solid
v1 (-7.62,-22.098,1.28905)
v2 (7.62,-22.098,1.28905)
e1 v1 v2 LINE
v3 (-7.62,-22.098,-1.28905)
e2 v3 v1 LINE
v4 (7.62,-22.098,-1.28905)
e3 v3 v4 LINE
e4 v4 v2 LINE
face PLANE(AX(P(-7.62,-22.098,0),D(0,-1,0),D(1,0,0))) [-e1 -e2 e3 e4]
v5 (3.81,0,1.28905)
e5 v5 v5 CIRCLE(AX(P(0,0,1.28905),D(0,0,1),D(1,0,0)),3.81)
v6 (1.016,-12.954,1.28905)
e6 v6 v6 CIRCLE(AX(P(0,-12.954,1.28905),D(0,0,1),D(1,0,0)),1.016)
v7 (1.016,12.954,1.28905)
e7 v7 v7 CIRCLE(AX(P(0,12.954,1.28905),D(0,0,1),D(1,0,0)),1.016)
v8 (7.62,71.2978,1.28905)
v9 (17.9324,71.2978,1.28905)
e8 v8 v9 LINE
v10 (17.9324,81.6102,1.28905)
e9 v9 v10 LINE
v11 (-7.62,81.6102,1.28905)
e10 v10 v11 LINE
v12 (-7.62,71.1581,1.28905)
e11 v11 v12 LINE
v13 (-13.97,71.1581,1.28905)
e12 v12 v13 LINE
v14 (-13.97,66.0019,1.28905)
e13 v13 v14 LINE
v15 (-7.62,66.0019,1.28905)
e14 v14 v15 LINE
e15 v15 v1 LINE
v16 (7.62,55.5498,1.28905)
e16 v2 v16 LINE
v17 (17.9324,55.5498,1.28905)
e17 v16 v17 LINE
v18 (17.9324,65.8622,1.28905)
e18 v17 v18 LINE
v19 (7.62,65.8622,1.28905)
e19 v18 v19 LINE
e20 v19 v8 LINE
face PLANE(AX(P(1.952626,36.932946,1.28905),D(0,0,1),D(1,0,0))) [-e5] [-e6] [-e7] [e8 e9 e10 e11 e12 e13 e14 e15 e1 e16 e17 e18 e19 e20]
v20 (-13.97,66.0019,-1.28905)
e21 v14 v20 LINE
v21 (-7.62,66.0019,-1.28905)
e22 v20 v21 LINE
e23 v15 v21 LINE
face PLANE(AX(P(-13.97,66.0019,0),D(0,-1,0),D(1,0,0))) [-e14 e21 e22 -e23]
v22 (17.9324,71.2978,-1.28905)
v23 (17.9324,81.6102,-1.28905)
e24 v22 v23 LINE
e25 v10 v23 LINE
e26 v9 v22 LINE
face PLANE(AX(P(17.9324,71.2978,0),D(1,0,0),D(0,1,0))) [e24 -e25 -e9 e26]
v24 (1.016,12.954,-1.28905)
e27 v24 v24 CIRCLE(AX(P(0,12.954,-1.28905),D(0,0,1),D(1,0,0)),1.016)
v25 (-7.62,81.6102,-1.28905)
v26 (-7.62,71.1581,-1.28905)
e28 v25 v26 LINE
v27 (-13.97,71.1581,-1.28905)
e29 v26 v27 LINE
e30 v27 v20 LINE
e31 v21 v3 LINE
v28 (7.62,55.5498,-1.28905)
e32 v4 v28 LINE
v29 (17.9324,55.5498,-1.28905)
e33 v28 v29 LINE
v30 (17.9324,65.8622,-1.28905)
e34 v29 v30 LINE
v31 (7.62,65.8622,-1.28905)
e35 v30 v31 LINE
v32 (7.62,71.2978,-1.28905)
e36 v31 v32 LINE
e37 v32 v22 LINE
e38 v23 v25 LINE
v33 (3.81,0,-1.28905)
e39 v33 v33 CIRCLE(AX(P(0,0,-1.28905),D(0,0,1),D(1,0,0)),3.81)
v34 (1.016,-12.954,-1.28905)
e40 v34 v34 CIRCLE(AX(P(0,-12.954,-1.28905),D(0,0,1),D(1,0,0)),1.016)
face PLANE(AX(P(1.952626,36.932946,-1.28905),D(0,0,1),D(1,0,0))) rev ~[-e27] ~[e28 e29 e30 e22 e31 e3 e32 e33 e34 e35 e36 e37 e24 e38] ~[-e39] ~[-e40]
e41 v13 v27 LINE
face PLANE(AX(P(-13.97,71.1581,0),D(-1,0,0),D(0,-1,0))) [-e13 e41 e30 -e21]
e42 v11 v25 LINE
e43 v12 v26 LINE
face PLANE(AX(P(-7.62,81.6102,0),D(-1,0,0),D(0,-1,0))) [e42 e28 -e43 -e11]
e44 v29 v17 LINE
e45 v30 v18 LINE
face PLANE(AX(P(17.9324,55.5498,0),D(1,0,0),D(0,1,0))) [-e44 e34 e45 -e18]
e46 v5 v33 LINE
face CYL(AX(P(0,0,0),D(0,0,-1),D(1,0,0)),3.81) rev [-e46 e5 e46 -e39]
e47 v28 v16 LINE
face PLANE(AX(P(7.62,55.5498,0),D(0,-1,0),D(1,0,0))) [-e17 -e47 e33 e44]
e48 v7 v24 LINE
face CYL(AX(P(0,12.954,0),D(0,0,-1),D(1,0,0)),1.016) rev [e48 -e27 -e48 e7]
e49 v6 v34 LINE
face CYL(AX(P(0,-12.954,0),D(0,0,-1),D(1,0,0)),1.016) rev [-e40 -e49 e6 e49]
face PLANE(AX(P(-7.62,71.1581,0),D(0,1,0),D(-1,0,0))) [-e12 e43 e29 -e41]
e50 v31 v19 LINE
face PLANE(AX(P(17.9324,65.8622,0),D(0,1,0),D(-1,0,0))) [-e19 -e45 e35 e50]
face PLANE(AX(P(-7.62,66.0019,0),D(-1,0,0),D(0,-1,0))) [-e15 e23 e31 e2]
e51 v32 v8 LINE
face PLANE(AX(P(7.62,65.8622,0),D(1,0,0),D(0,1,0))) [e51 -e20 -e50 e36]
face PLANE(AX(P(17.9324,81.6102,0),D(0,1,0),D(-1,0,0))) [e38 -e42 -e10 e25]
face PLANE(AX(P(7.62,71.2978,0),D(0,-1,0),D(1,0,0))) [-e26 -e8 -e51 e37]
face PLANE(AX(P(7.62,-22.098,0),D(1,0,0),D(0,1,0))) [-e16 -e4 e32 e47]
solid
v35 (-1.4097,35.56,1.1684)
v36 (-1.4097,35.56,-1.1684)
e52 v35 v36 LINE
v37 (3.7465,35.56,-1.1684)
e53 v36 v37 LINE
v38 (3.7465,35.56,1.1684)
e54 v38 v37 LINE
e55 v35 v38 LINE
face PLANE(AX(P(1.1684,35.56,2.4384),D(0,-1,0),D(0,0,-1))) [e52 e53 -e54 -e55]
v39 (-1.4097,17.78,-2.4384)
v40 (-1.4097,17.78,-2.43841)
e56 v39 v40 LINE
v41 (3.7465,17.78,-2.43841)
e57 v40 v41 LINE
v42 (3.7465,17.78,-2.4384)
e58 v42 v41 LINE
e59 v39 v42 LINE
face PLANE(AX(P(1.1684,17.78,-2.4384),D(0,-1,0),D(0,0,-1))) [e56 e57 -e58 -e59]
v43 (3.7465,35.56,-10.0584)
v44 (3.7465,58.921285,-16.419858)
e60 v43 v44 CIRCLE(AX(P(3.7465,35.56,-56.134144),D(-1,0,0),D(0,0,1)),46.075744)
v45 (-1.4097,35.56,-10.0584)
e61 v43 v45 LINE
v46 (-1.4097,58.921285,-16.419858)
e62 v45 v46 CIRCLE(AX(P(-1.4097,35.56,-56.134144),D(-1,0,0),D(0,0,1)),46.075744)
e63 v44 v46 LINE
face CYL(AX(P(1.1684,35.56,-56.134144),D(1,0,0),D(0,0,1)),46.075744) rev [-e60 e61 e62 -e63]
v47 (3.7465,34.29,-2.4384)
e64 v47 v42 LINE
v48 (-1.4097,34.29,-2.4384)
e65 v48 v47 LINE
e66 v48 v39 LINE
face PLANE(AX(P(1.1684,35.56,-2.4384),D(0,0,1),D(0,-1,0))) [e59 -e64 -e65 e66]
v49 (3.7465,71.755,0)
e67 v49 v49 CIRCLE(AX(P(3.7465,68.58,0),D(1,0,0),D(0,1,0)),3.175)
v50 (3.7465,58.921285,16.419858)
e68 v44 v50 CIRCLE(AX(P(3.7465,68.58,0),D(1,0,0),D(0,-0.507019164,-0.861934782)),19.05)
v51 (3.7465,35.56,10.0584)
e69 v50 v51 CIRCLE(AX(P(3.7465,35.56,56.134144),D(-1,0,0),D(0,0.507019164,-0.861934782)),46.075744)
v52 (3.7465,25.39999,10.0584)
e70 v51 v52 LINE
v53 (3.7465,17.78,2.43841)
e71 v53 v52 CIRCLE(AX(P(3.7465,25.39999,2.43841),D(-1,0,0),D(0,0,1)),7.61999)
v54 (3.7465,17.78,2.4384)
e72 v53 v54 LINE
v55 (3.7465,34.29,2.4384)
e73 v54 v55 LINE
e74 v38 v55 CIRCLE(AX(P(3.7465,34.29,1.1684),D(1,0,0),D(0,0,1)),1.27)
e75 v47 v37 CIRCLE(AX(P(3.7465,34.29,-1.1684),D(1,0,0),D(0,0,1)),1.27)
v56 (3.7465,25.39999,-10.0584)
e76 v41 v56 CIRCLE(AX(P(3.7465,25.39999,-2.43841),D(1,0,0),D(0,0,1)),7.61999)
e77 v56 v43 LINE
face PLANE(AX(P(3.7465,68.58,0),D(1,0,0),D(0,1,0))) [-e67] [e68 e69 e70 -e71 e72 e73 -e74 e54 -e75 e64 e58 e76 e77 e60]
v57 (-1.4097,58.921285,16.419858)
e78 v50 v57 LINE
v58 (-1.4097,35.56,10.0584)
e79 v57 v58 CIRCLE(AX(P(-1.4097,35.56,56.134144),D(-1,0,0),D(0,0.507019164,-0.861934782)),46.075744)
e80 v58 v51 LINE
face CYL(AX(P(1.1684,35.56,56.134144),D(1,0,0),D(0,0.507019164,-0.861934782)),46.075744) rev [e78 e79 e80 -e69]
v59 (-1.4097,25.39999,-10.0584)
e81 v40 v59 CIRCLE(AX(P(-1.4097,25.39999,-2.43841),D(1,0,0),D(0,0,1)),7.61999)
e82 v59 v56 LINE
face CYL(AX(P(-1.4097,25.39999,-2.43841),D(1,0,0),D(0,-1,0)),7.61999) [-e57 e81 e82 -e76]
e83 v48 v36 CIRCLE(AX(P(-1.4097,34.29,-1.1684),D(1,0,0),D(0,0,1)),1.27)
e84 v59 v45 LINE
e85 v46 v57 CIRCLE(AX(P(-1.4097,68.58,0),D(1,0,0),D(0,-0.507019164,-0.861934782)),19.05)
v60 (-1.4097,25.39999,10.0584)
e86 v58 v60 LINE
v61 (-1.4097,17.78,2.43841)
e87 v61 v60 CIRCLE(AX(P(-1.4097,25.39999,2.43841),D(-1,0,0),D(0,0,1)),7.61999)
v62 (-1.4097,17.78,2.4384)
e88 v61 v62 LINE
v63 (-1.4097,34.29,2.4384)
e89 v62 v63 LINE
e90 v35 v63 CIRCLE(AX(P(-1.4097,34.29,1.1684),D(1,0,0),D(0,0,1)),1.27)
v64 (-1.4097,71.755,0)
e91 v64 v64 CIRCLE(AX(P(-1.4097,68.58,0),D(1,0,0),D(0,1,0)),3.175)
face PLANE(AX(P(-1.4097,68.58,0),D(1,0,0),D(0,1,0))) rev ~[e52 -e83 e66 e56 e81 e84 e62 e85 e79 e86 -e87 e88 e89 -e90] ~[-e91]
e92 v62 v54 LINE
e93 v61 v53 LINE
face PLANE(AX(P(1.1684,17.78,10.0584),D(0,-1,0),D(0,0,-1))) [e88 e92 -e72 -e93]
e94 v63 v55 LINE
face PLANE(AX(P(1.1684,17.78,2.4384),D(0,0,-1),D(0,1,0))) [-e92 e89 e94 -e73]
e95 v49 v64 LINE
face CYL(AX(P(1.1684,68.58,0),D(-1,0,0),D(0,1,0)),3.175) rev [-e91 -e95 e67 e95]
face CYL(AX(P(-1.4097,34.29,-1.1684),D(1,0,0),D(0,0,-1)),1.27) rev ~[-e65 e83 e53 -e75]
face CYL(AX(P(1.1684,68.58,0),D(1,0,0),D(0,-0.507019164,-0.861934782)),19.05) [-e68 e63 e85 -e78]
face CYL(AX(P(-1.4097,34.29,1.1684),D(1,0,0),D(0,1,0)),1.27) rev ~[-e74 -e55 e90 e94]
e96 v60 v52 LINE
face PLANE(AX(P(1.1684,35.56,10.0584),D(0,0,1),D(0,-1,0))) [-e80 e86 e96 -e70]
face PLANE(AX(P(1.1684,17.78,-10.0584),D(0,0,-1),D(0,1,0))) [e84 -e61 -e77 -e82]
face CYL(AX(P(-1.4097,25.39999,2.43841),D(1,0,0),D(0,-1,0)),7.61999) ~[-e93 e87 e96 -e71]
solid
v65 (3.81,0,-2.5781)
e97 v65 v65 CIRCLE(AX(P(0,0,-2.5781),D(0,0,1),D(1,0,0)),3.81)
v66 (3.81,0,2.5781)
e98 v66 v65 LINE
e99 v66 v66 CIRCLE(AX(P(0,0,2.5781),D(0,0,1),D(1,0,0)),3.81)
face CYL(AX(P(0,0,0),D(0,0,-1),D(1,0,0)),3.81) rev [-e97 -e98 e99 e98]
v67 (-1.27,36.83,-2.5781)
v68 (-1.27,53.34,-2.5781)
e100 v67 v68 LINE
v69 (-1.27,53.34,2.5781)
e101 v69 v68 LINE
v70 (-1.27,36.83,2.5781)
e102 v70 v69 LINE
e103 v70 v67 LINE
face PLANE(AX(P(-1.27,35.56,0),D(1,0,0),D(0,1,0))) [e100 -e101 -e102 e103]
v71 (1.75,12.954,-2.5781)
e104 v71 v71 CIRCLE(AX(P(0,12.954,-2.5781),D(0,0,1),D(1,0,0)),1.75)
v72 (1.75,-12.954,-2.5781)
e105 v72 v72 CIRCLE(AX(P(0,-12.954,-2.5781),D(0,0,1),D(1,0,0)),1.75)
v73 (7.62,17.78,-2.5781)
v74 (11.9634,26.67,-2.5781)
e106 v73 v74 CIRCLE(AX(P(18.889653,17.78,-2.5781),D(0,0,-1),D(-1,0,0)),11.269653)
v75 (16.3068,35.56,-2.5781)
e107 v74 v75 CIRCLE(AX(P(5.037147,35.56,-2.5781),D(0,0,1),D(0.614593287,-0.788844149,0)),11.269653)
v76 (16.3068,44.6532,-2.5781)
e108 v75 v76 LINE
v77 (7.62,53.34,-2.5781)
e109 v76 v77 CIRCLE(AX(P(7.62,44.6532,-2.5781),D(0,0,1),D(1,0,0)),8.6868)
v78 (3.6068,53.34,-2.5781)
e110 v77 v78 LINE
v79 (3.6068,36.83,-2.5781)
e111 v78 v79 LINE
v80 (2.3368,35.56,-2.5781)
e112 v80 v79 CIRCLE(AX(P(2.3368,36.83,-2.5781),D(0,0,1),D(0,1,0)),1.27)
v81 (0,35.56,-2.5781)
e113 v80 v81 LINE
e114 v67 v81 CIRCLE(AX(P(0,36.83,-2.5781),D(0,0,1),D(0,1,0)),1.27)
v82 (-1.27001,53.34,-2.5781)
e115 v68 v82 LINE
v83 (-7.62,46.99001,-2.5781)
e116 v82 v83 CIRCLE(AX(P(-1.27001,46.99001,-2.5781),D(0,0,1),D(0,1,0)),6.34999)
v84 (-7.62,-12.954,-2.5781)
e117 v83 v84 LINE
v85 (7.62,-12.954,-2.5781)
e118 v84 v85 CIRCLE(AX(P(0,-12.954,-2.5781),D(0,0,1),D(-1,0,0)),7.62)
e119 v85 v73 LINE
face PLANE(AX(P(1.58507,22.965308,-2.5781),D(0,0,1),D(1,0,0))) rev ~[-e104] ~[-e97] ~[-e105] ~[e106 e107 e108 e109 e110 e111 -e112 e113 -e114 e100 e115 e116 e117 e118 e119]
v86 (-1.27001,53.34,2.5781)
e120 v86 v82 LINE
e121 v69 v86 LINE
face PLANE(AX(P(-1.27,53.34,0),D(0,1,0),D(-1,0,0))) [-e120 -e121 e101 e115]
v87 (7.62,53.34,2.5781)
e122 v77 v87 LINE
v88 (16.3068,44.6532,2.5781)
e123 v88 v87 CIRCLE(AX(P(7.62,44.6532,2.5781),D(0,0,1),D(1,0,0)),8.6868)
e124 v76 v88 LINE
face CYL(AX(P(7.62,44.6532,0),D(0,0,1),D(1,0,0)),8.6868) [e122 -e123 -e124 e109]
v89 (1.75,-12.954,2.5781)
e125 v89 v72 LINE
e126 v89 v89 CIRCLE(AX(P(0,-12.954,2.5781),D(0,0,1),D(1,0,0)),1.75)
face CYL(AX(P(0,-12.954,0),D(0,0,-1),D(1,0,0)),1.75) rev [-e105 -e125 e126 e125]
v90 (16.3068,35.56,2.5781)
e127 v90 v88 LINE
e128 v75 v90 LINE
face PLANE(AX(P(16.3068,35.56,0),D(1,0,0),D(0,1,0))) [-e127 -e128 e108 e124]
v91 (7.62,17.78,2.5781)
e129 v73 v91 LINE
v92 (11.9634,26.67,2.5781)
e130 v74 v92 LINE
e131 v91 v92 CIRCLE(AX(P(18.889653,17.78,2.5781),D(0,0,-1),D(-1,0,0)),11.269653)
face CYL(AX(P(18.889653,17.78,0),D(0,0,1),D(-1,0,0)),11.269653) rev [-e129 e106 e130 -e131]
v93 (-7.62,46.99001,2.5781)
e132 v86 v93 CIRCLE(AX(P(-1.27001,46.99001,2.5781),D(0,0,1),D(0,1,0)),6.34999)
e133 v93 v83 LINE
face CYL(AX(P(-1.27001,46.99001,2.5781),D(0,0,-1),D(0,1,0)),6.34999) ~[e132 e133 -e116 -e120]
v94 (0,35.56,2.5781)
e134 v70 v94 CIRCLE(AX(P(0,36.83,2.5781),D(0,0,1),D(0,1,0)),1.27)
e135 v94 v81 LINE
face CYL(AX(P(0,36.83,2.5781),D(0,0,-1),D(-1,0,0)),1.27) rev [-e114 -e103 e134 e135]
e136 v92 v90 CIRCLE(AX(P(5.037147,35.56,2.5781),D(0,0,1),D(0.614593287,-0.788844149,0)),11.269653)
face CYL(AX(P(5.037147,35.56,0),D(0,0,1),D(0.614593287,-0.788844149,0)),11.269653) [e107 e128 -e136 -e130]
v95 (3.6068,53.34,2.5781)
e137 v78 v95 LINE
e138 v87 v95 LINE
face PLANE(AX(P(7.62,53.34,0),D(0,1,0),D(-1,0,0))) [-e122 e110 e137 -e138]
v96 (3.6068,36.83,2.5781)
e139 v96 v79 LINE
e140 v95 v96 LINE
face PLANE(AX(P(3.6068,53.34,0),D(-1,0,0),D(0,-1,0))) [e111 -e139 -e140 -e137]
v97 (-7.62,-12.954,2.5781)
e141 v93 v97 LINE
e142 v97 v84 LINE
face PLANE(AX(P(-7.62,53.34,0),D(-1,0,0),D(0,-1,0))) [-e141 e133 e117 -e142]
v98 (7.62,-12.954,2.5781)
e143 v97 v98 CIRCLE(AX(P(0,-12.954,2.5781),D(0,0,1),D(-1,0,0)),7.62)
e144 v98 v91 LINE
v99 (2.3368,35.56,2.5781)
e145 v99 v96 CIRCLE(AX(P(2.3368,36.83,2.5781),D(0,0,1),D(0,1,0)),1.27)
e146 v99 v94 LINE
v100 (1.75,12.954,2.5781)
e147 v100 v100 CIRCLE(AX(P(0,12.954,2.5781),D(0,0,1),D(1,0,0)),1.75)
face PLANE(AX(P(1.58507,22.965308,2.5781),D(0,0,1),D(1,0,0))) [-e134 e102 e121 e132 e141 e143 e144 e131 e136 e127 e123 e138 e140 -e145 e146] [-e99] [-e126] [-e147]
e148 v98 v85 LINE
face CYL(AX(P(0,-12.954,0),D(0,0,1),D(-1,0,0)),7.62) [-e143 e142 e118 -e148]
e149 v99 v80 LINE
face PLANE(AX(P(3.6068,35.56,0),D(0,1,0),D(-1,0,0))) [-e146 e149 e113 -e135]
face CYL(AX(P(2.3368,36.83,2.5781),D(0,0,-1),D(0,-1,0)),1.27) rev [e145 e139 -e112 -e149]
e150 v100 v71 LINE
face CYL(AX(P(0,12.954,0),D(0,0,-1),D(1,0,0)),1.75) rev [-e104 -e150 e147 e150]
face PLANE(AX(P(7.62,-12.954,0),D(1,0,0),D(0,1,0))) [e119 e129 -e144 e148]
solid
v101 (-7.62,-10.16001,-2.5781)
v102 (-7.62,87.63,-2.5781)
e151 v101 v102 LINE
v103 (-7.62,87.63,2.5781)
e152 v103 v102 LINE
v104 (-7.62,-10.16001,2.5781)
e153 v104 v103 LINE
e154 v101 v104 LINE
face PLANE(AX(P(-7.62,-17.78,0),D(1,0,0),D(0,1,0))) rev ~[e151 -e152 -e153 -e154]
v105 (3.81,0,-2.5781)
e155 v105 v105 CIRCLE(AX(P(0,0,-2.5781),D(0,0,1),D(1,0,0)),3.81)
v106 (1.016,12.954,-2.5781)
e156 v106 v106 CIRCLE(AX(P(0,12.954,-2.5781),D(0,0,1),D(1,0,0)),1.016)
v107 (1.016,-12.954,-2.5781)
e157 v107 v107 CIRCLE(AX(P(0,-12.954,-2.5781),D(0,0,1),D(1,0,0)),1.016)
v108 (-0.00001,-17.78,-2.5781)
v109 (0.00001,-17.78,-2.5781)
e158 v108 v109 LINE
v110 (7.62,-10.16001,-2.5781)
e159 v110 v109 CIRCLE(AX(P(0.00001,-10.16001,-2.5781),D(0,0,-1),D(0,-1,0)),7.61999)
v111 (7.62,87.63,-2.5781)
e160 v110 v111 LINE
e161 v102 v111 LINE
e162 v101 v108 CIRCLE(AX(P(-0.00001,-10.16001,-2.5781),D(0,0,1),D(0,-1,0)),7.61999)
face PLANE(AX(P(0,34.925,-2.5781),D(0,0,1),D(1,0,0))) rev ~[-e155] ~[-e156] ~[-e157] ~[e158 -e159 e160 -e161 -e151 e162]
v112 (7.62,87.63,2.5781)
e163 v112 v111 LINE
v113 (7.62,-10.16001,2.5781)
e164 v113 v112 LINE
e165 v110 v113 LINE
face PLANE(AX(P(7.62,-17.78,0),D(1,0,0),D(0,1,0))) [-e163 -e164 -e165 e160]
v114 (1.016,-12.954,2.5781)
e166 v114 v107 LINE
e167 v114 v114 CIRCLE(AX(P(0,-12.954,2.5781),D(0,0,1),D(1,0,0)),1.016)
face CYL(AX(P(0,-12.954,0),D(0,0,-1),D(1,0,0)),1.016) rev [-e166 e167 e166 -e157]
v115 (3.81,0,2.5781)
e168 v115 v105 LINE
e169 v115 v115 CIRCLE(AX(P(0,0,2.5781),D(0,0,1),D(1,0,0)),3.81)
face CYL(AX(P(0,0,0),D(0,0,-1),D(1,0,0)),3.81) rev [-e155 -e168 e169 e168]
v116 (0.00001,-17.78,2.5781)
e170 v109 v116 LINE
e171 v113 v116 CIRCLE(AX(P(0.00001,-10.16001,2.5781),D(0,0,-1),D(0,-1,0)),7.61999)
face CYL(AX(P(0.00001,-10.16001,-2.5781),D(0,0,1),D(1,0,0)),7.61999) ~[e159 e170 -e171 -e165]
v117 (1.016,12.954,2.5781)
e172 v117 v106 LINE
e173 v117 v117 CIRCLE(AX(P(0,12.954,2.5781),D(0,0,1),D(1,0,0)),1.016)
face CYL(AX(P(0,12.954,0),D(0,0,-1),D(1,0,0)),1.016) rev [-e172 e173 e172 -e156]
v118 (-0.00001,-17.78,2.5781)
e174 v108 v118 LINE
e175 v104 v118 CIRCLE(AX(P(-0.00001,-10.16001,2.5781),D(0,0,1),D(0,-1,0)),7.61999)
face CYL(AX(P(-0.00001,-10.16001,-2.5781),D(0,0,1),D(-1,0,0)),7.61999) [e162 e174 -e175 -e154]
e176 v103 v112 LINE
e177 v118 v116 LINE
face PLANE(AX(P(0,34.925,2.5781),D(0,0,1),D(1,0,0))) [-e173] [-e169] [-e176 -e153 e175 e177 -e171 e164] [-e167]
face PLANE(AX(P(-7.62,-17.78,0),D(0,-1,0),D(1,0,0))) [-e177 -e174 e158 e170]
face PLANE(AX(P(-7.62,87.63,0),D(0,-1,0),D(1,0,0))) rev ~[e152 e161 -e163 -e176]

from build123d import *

# Parameters (mm, degrees)
F1_R      = 1.016
F1_R_2    = 3.81
F2_DEPTH  = 1.28905
F3_R      = 1.75
F3_R_2    = 3.81
F4_DEPTH  = 2.5781
F5_R      = 1.27
F6_R      = 6.34999
F9_R      = 3.175
F10_DEPTH = 2.5781
F11_R     = 1.27
F12_R     = 7.61999
F13_W     = 15.24
F13_H     = 105.41
F13_R     = 1.016
F13_R_2   = 3.81
F14_DEPTH = 2.5781
F15_R     = 7.61999


# Not quite as in the source:
# - a variable given as a bare number and used for a length is read in inches; the dataset says mm whatever the document's units were
# - a fillet or chamfer is up to 0.001 mm smaller than in the source, because OpenCascade refuses the exact size


with BuildPart() as f2:
    # F1 (on Top) → F2 (new body, symmetric)
    with BuildSketch(Plane.XY):
        Polygon((-7.62, 66.0019), (-7.62, -22.098), (7.62, -22.098), (7.62, 55.5498), (17.9324, 55.5498), (17.9324, 65.8622), (7.62, 65.8622), (7.62, 71.2978), (17.9324, 71.2978), (17.9324, 81.6102), (7.62, 81.6102), (-7.62, 81.6102), (-7.62, 71.1581), (-13.97, 71.1581), (-13.97, 66.0019), align=None)
        with Locations((0, -12.954)):
            Circle(F1_R, mode=Mode.SUBTRACT)
        Circle(F1_R_2, mode=Mode.SUBTRACT)
        with Locations((0, 12.954)):
            Circle(F1_R, mode=Mode.SUBTRACT)
    extrude(amount=F2_DEPTH, both=True)


with BuildPart() as f4:
    # F3 (on Top) → F4 (new body, symmetric)
    with BuildSketch(Plane.XY):
        with BuildLine():
            Line((7.62, -12.954), (7.62, 17.78))
            ThreePointArc((7.62, 17.78), (8.7639049612, 22.7271512904), (11.9634, 26.67))
            ThreePointArc((11.9634, 26.67), (15.1628950388, 30.6128487096), (16.3068, 35.56))
            Line((16.3068, 35.56), (16.3068, 44.6532))
            ThreePointArc((16.3068, 44.6532), (13.7624951868, 50.7956951868), (7.62, 53.34))
            Line((7.62, 53.34), (3.6068, 53.34))
            Line((3.6068, 53.34), (3.6068, 35.56))
            Line((3.6068, 35.56), (-1.27, 35.56))
            Line((-1.27, 35.56), (-1.27, 53.34))
            Line((-1.27, 53.34), (-7.62, 53.34))
            Line((-7.62, 53.34), (-7.62, -12.954))
            ThreePointArc((-7.62, -12.954), (0, -20.574), (7.62, -12.954))
        make_face()
        with Locations((0, -12.954)):
            Circle(F3_R, mode=Mode.SUBTRACT)
        Circle(F3_R_2, mode=Mode.SUBTRACT)
        with Locations((0, 12.954)):
            Circle(F3_R, mode=Mode.SUBTRACT)
    extrude(amount=F4_DEPTH, both=True)

    # F5
    f5_edges = [f4.edges().sort_by_distance(p)[0] for p in [
        (3.6068, 35.56, 0),
        (-1.27, 35.56, 0),
    ]]
    fillet(f5_edges, radius=F5_R)

    # F6 (radius 6.35 in the source; OpenCascade refuses exactly that, so slightly less here)
    f6_edges = [f4.edges().sort_by_distance(p)[0] for p in [
        (-7.62, 53.34, 0),
    ]]
    fillet(f6_edges, radius=F6_R)


with BuildPart() as f10:
    # F9 (on plane+point) → F10 (new body, symmetric)
    with BuildSketch(Plane.YZ.offset(1.1684)):
        with BuildLine():
            ThreePointArc((58.9212849333, -16.4198575895), (78.0379061631, -16.5363391054), (87.63, 0))
            ThreePointArc((87.63, 0), (78.0379061631, 16.5363391054), (58.9212849333, 16.4198575895))
            ThreePointArc((58.9212849333, 16.4198575895), (49.53, 0), (58.9212849333, -16.4198575895))
        make_face()
        with Locations((68.58, 0)):
            Circle(F9_R, mode=Mode.SUBTRACT)
        with BuildLine():
            ThreePointArc((58.9212849333, -16.4198575895), (49.53, 0), (58.9212849333, 16.4198575895))
            ThreePointArc((58.9212849333, 16.4198575895), (47.665967293, 11.6772014663), (35.56, 10.0584))
            Line((35.56, 10.0584), (17.78, 10.0584))
            Line((17.78, 10.0584), (17.78, 2.4384))
            Line((17.78, 2.4384), (35.56, 2.4384))
            Line((35.56, 2.4384), (35.56, 0))
            Line((35.56, 0), (35.56, -2.4384))
            Line((35.56, -2.4384), (17.78, -2.4384))
            Line((17.78, -2.4384), (17.78, -10.0584))
            Line((17.78, -10.0584), (35.56, -10.0584))
            ThreePointArc((35.56, -10.0584), (47.665967293, -11.6772014663), (58.9212849333, -16.4198575895))
        make_face()
    extrude(amount=F10_DEPTH, both=True)

    # F11
    f11_edges = [f10.edges().sort_by_distance(p)[0] for p in [
        (1.1684, 35.56, 2.4384),
        (1.1684, 35.56, -2.4384),
    ]]
    fillet(f11_edges, radius=F11_R)

    # F12 (radius 7.62 in the source; OpenCascade refuses exactly that, so slightly less here)
    f12_edges = [f10.edges().sort_by_distance(p)[0] for p in [
        (1.1684, 17.78, -10.0584),
        (1.1684, 17.78, 10.0584),
    ]]
    fillet(f12_edges, radius=F12_R)


with BuildPart() as f14:
    # F13 (on Top) → F14 (new body, symmetric)
    with BuildSketch(Plane.XY):
        with Locations((0, 34.925)):
            Rectangle(F13_W, F13_H)
        with Locations((0, -12.954)):
            Circle(F13_R, mode=Mode.SUBTRACT)
        Circle(F13_R_2, mode=Mode.SUBTRACT)
        with Locations((0, 12.954)):
            Circle(F13_R, mode=Mode.SUBTRACT)
    extrude(amount=F14_DEPTH, both=True)

    # F15 (radius 7.62 in the source; OpenCascade refuses exactly that, so slightly less here)
    f15_edges = [f14.edges().sort_by_distance(p)[0] for p in [
        (7.62, -17.78, 0),
        (-7.62, -17.78, 0),
    ]]
    fillet(f15_edges, radius=F15_R)


solid = Compound([f2.part, f4.part, f10.part, f14.part])
